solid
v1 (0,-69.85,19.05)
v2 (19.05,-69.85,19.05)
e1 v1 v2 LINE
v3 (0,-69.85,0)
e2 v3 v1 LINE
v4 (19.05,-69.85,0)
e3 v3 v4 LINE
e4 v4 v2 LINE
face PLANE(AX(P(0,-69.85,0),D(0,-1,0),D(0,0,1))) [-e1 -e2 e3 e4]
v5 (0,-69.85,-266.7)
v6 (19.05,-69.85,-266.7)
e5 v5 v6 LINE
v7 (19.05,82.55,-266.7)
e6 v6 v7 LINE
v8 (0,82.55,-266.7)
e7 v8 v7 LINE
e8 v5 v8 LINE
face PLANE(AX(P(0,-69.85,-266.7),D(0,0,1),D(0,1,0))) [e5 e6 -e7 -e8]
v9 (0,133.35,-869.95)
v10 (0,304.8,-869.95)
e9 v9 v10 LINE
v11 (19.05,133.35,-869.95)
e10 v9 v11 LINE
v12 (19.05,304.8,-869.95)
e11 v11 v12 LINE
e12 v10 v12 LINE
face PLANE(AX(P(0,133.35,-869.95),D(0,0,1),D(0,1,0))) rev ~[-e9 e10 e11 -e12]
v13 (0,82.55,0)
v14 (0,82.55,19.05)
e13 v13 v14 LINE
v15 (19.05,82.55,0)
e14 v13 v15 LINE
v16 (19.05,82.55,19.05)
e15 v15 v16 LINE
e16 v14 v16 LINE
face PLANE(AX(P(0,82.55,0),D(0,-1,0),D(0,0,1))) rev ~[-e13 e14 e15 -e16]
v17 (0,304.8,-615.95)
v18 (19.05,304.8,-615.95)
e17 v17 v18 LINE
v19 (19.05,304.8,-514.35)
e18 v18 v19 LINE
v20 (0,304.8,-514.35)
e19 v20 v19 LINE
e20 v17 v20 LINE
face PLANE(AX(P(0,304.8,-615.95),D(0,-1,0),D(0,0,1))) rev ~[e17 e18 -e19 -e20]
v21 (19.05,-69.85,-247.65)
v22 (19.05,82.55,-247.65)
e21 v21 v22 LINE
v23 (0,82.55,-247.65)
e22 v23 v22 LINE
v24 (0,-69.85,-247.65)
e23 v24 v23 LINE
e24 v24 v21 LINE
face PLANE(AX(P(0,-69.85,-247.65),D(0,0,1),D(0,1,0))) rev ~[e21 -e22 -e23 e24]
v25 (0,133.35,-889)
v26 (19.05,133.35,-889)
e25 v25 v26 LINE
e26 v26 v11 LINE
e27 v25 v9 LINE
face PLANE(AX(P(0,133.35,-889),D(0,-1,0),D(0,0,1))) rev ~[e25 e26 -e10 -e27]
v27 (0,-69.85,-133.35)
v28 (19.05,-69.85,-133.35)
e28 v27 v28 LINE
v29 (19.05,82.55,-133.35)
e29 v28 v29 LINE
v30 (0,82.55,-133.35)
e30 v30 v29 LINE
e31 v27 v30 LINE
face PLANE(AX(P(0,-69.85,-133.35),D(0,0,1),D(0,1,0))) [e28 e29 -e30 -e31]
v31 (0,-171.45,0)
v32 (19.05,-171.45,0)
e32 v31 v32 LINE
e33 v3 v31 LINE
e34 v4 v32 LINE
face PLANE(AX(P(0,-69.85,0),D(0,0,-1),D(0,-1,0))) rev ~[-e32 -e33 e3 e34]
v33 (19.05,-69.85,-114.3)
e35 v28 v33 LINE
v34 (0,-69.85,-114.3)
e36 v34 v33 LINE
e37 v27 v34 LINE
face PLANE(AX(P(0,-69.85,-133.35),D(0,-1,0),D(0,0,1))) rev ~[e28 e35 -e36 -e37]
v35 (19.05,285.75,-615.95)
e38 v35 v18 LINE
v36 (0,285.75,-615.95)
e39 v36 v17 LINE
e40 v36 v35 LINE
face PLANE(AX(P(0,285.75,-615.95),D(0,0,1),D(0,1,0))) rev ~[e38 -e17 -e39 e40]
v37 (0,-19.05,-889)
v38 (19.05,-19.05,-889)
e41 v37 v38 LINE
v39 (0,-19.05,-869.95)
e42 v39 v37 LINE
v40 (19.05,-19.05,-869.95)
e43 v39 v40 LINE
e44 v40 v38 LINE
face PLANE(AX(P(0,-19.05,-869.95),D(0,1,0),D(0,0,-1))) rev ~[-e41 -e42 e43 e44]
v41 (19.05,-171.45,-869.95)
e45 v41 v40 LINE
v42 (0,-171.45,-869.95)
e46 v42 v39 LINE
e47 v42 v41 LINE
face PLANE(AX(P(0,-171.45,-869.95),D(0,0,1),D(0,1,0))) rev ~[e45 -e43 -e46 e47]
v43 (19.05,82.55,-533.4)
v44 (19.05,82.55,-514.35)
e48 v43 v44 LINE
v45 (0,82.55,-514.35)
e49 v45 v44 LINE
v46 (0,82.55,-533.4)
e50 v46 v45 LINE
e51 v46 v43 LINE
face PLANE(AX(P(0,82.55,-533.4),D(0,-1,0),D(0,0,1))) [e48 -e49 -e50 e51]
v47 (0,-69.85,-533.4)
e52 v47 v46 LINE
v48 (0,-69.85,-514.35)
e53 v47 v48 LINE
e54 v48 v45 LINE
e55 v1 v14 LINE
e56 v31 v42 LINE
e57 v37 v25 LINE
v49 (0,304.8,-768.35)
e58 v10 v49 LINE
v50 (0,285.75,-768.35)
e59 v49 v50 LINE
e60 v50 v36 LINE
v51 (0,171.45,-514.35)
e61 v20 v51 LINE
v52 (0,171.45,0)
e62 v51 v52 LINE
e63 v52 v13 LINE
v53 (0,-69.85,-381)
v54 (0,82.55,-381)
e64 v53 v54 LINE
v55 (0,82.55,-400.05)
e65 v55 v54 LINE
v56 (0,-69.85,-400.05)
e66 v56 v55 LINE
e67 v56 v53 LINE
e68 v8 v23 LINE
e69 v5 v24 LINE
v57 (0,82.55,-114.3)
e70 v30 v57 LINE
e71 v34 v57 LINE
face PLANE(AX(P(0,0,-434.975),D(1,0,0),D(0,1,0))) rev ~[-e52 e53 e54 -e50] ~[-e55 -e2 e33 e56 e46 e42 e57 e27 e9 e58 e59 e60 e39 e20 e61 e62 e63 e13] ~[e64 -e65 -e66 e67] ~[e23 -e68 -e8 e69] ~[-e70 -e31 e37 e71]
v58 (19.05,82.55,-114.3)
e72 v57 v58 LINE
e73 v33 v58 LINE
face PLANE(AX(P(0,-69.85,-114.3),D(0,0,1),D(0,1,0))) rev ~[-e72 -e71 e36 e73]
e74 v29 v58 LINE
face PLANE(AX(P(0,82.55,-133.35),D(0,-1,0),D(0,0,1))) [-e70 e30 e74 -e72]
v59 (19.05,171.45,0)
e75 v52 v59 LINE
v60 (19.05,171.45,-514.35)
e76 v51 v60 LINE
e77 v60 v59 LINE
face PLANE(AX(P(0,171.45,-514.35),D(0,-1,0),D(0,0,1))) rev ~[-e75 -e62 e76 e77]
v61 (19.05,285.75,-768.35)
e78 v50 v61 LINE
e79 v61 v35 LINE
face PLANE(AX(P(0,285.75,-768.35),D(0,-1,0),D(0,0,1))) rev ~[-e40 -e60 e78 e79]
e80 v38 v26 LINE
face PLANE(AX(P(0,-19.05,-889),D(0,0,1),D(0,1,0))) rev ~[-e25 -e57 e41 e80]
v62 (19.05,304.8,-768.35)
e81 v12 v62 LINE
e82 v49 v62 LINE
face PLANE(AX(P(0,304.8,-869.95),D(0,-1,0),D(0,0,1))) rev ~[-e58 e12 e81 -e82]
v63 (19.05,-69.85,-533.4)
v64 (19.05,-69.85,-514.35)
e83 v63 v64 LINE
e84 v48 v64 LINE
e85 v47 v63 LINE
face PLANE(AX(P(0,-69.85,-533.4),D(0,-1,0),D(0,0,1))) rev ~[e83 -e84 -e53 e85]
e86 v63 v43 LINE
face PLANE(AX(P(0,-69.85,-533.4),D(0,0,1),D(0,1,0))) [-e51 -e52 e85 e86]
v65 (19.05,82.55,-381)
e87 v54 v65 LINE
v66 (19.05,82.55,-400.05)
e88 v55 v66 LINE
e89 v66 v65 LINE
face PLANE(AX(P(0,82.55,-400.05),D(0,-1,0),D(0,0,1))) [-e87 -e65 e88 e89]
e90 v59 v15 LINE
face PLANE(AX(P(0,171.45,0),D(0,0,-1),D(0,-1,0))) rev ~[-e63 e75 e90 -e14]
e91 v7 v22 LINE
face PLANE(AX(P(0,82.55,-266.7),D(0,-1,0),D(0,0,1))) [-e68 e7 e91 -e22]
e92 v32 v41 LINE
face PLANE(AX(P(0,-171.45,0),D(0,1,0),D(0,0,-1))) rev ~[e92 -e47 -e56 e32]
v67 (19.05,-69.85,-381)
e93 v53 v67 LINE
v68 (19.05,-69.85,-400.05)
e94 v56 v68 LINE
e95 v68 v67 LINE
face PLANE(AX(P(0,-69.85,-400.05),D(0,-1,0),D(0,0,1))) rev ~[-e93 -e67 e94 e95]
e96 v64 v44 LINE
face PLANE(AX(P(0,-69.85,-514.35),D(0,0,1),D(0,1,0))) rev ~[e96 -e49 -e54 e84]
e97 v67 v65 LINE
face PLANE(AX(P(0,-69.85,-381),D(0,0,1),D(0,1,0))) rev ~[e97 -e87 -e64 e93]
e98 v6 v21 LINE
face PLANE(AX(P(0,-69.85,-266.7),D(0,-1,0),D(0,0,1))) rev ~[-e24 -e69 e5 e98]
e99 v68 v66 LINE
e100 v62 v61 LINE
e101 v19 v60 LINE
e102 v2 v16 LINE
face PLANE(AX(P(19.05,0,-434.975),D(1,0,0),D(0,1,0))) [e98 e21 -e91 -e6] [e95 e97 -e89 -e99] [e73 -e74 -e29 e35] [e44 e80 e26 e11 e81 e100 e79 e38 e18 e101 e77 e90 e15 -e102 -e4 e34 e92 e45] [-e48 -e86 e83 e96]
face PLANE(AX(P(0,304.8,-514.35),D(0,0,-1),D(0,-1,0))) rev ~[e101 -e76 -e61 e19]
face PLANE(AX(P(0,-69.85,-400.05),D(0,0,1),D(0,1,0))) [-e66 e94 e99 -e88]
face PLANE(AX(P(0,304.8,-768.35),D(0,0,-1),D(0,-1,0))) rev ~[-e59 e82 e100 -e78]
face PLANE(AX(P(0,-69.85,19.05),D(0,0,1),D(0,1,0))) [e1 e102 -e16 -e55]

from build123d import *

# Parameters (mm, degrees)
F0_W     = 152.4
F0_H     = 19.05
F1_DEPTH = 19.05


# Not quite as in the source:
# - a feature names something its author has since deleted; it is built from what else it names


with BuildPart() as f1:
    # F0 (on Right) → F1 (new body)
    with BuildSketch(Plane.YZ):
        Polygon((-69.85, 0), (-171.45, 0), (-171.45, -869.95), (-19.05, -869.95), (40.3552334547, -869.95), (133.35, -869.95), (171.45, -869.95), (171.45, -514.35), (171.45, 0), (82.55, 0), align=None)
        with Locations((6.35, -523.875)):
            Rectangle(F0_W, F0_H, mode=Mode.SUBTRACT)
        with Locations((6.35, -390.525)):
            Rectangle(F0_W, F0_H, mode=Mode.SUBTRACT)
        with Locations((6.35, -257.175)):
            Rectangle(F0_W, F0_H, mode=Mode.SUBTRACT)
        with Locations((6.35, -123.825)):
            Rectangle(F0_W, F0_H, mode=Mode.SUBTRACT)
        Polygon((40.3552334547, -869.95), (-19.05, -869.95), (-19.05, -889), (133.35, -889), (133.35, -869.95), align=None)
        Polygon((304.8, -514.35), (171.45, -514.35), (171.45, -869.95), (304.8, -869.95), (304.8, -768.35), (285.75, -768.35), (285.75, -615.95), (304.8, -615.95), align=None)
        with Locations((6.35, 9.525)):
            Rectangle(F0_W, F0_H)
    extrude(amount=F1_DEPTH)


solid = f1.part
